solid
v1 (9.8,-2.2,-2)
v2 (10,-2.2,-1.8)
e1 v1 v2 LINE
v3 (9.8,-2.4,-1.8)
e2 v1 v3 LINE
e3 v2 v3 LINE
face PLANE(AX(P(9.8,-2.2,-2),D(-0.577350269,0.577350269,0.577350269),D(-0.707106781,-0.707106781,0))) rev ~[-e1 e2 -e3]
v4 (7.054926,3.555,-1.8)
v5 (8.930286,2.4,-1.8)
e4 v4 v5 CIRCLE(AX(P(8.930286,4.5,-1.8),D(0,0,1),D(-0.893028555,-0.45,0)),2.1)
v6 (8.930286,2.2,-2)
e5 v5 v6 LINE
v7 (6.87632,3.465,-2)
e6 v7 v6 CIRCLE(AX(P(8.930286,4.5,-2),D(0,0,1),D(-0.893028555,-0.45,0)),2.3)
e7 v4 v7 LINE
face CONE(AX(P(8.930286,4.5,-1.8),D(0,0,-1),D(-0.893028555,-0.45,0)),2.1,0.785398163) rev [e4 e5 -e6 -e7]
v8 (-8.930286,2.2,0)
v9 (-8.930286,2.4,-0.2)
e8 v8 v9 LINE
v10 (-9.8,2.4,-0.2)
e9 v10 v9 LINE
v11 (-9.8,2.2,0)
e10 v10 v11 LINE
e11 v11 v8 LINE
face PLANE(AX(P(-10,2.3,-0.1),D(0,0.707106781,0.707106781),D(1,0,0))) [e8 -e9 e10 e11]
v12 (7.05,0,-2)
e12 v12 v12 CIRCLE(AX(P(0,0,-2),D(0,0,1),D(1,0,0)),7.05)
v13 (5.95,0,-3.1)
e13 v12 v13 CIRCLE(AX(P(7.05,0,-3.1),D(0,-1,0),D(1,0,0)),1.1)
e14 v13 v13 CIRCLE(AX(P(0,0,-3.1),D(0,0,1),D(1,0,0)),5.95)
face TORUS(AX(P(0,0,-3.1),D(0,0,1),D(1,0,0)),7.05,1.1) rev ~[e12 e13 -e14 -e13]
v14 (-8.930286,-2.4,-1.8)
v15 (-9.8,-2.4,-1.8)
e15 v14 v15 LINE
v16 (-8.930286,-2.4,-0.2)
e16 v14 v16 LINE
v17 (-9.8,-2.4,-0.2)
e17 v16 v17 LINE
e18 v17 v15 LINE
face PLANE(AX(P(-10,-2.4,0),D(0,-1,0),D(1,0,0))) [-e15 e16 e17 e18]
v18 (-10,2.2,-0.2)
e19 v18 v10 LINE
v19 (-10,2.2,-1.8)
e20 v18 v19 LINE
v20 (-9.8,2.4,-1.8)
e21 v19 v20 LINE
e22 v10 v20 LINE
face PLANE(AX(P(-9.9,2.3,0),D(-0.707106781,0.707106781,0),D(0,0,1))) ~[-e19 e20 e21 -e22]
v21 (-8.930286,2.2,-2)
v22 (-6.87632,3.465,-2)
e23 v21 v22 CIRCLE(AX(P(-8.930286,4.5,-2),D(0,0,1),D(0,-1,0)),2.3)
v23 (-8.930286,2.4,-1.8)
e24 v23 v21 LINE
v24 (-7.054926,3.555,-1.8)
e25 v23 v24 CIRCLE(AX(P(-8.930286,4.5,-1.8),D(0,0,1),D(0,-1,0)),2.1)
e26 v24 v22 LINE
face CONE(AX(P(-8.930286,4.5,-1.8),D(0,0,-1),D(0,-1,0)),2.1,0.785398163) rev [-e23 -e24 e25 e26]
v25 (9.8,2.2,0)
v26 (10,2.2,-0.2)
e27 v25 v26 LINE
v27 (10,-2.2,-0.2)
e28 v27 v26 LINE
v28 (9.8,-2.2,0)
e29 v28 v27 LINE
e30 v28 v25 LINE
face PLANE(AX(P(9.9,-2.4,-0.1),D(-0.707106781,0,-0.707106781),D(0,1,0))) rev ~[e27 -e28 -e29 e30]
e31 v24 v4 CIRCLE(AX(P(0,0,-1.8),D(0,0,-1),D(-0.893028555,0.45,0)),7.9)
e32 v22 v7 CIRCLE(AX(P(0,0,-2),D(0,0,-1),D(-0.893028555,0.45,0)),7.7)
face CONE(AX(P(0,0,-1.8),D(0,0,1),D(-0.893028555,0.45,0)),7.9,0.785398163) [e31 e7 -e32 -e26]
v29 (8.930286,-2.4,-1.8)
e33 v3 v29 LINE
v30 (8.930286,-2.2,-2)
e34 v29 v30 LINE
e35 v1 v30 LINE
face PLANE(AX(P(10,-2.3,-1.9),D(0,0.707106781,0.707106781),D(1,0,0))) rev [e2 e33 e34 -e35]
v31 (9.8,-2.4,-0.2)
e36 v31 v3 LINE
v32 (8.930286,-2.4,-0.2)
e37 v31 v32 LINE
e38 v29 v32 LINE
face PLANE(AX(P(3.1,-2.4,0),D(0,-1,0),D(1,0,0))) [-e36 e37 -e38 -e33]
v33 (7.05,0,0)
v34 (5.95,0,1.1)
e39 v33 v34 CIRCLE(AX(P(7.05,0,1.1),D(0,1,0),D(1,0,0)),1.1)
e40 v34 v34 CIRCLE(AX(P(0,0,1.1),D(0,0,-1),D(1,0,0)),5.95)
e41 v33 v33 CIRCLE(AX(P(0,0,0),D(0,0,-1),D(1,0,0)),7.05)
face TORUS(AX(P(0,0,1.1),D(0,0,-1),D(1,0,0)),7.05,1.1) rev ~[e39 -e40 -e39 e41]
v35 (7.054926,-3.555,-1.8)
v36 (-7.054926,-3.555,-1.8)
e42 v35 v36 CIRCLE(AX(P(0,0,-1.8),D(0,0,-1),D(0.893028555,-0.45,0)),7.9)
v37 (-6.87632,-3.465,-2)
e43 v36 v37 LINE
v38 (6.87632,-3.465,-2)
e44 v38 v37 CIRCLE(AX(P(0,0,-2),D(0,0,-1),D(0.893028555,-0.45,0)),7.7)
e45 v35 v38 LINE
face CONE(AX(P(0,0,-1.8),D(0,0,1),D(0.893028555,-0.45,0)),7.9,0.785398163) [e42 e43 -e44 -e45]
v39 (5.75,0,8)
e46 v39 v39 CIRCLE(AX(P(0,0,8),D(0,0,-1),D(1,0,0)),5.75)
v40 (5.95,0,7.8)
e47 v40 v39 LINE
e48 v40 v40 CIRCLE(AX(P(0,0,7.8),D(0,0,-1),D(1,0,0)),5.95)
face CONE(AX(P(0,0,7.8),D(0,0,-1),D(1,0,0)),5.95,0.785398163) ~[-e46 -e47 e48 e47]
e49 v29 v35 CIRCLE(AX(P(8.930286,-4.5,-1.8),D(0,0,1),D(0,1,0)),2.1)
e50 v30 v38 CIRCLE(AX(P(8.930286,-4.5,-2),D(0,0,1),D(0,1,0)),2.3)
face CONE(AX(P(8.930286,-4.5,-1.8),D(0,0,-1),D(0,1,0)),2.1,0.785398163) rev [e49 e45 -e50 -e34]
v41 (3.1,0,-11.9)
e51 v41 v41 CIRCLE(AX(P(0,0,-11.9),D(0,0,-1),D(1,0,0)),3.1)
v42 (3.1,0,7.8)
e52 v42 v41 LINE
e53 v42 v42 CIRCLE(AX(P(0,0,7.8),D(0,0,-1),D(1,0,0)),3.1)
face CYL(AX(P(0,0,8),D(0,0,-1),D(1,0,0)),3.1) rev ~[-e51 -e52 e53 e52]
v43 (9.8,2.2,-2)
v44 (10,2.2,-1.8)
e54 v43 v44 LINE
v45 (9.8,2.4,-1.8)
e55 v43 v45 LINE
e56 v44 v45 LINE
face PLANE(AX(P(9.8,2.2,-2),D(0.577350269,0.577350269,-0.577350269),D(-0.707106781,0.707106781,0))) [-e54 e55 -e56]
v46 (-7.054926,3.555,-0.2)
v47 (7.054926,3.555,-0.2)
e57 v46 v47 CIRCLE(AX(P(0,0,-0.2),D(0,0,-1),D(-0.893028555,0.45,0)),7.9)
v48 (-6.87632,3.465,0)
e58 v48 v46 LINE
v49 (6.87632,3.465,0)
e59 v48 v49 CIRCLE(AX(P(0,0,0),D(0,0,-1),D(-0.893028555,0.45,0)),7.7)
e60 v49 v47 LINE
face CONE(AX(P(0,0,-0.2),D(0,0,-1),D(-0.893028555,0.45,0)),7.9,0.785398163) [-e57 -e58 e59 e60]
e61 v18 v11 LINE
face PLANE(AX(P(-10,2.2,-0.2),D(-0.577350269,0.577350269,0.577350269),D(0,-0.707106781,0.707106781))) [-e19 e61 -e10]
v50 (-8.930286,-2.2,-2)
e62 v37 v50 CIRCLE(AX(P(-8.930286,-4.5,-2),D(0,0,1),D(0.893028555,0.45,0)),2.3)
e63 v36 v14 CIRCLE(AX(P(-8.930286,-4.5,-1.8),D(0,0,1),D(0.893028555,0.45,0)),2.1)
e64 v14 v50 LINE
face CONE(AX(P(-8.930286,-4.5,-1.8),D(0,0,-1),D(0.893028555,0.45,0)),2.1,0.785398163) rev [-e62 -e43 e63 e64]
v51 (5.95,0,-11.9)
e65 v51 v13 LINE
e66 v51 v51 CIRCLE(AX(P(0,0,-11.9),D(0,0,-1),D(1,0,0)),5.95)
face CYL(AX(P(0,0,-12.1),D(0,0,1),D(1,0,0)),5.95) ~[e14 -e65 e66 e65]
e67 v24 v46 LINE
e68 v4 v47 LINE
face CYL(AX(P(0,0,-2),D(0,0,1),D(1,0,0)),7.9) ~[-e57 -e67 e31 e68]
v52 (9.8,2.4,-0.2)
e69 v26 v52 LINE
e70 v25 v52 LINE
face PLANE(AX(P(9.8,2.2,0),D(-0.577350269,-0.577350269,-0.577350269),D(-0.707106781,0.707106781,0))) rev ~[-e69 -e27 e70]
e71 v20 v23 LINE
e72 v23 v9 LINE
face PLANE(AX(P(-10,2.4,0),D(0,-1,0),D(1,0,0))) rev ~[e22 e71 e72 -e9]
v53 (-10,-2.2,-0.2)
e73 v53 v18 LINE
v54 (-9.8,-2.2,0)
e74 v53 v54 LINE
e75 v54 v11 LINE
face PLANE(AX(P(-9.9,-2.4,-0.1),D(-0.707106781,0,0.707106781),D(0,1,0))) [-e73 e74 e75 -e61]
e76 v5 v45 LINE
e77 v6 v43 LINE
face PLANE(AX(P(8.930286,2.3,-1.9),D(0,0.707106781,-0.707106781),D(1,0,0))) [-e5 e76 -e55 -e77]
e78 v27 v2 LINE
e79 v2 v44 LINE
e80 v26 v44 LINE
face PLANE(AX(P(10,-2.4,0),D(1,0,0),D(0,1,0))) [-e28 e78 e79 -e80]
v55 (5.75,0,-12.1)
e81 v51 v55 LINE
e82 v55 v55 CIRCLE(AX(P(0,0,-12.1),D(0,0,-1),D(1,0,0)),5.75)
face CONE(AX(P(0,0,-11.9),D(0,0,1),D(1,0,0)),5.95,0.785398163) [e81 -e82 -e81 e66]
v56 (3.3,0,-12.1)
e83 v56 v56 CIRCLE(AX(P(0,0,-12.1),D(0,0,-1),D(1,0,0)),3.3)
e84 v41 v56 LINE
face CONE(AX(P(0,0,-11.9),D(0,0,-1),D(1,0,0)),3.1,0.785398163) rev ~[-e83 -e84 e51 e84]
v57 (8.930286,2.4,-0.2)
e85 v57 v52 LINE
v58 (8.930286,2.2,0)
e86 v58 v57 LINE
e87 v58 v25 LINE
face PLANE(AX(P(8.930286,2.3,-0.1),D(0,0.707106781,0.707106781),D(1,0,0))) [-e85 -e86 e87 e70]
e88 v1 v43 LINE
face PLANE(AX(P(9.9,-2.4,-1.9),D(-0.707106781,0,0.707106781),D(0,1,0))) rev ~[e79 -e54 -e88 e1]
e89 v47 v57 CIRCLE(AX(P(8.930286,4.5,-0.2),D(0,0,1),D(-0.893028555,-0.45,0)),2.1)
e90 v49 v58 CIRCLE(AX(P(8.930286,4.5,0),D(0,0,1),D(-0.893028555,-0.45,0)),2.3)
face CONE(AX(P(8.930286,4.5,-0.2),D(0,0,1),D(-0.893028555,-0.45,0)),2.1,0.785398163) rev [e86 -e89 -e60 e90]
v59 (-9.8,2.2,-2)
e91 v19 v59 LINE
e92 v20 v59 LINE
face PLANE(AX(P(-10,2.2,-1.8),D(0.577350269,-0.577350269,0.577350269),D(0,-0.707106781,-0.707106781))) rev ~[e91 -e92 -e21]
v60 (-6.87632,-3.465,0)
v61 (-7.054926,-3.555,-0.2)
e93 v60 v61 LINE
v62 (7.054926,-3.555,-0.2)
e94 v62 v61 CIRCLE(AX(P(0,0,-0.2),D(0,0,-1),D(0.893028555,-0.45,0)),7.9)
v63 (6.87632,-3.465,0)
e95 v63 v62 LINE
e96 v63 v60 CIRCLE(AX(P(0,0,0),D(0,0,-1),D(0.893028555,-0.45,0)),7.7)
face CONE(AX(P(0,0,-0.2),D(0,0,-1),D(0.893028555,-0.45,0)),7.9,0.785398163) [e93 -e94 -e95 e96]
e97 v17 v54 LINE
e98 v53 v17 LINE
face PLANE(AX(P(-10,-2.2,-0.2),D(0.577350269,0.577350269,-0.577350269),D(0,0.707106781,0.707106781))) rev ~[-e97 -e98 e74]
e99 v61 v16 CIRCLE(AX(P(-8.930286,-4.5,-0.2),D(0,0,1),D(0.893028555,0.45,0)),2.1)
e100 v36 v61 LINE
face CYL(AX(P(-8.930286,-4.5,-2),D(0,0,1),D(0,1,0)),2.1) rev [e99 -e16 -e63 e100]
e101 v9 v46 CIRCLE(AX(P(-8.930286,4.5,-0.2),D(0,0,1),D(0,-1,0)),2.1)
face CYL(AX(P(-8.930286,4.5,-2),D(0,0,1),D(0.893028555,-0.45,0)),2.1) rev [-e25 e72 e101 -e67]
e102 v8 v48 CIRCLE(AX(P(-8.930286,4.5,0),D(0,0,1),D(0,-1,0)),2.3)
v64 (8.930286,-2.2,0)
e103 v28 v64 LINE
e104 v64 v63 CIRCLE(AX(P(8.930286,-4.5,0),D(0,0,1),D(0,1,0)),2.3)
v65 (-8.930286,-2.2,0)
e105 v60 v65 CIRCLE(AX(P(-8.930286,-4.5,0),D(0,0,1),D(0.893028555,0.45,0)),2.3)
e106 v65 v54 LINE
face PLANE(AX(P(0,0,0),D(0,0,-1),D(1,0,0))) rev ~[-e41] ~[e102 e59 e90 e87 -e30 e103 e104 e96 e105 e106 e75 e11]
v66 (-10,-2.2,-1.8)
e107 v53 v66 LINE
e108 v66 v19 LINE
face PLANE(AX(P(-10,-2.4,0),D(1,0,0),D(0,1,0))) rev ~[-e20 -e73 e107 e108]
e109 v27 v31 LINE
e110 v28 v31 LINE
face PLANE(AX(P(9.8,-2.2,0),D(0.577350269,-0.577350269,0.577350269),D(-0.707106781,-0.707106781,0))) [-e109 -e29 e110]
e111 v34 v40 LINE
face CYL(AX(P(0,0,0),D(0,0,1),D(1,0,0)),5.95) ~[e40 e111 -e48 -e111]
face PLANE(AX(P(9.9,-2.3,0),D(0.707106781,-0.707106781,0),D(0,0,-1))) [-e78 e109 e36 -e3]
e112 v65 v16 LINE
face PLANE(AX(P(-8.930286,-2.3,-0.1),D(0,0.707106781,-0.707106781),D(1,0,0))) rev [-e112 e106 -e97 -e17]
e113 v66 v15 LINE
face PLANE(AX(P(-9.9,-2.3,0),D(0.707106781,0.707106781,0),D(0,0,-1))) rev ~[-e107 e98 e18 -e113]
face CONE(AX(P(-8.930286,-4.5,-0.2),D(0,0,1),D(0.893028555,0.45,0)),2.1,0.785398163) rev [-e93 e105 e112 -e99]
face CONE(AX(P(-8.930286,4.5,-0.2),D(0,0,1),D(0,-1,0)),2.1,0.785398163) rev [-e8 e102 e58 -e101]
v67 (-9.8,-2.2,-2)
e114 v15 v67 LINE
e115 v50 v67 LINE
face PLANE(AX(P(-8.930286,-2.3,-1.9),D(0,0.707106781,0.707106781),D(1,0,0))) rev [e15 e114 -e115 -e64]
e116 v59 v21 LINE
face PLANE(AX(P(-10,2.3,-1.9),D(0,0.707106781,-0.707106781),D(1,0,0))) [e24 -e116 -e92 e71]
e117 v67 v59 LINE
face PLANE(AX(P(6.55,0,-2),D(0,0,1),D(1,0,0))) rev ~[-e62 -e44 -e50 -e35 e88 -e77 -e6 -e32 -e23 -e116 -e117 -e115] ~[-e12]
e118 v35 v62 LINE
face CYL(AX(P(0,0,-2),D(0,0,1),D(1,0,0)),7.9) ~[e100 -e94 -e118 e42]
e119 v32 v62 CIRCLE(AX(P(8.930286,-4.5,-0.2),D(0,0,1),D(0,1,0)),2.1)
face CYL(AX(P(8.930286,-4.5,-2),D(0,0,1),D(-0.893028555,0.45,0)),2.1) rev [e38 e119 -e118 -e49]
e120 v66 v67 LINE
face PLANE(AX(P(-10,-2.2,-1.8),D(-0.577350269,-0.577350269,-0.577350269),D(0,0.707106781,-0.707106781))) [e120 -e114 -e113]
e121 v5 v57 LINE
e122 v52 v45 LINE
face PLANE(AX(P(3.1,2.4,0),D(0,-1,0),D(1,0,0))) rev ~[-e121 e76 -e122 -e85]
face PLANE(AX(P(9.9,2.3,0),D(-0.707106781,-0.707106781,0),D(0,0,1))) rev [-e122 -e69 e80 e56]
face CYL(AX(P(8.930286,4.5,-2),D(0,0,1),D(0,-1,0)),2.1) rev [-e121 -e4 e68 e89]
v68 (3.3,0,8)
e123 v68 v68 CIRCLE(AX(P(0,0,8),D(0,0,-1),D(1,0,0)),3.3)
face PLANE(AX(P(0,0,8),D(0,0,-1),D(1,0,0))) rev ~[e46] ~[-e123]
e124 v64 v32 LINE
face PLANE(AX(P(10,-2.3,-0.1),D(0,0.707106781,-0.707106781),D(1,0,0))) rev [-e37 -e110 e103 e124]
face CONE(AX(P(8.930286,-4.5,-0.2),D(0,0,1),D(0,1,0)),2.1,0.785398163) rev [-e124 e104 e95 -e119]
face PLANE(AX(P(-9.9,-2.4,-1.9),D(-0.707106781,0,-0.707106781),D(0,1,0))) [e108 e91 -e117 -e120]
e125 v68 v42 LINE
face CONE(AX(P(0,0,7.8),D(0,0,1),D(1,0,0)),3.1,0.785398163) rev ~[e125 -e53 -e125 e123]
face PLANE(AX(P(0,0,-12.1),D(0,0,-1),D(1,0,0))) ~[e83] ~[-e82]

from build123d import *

# Parameters (mm, degrees)
F2_W     = 6.9
F2_H     = 4.8
F3_DEPTH = 2
F4_R     = 2.1
F5_SIZE  = 0.2
F6_R     = 1.1


# Not quite as in the source:
# - a feature names something its author has since deleted; it is built from what else it names


with BuildPart() as f1:
    # F0 (on Front) → F1 (revolve)
    with BuildSketch(Plane.XZ):
        Polygon((3.1, 0), (3.1, -12.1), (5.95, -12.1), (5.95, -2), (7.9, -2), (7.9, 0), (5.95, 0), (5.95, 8), (3.1, 8), align=None)
    revolve(axis=Axis((0, 0, -6.05), (0, 0, -1)))

    # F2 (on face) → F3 (join)
    with BuildSketch(Plane.XY):
        with Locations((6.55, 0)):
            Rectangle(F2_W, F2_H)
        with Locations((-6.55, 0)):
            Rectangle(F2_W, F2_H)
    extrude(amount=-F3_DEPTH)

    # F4
    f4_edges = [f1.edges().sort_by_distance(p)[0] for p in [
        (7.526619, -2.4, -1),
        (7.526619, 2.4, -1),
        (-7.526619, 2.4, -1),
        (-7.526619, -2.4, -1),
    ]]
    fillet(f4_edges, radius=F4_R)

    # F5
    f5_edges = [f1.edges().sort_by_distance(p)[0] for p in [
        (3.1, 0, -2.05),
        (-3.1, 0, -12.1),
        (-3.1, 0, 8),
        (-3.1, 0, -1),
        (10, -2.4, -1),
        (10, 2.4, -1),
        (10, 0, 0),
        (10, 0, -2),
        (0, -7.9, -2),
        (0, -7.9, 0),
        (9.465143, -2.4, 0),
        (9.465143, -2.4, -2),
        (9.465143, 2.4, 0),
        (9.465143, 2.4, -2),
        (-10, 2.4, -1),
        (-10, -2.4, -1),
        (-10, 0, 0),
        (-10, 0, -2),
        (-9.465143, -2.4, 0),
        (-9.465143, -2.4, -2),
        (-9.465143, 2.4, -2),
        (-9.465143, 2.4, 0),
        (-5.95, 0, 8),
        (-5.95, 0, -12.1),
        (7.829036, -2.711914, 0),
        (-7.829036, -2.711914, 0),
        (7.829036, 2.711914, 0),
        (0, 7.9, 0),
        (-7.829036, 2.711914, 0),
        (7.829036, -2.711914, -2),
        (-7.829036, -2.711914, -2),
        (7.829036, 2.711914, -2),
        (0, 7.9, -2),
        (-7.829036, 2.711914, -2),
    ]]
    chamfer(f5_edges, length=F5_SIZE)

    # F6
    f6_edges = [f1.edges().sort_by_distance(p)[0] for p in [
        (-5.95, 0, -2),
        (-5.95, 0, 0),
    ]]
    fillet(f6_edges, radius=F6_R)


solid = f1.part
